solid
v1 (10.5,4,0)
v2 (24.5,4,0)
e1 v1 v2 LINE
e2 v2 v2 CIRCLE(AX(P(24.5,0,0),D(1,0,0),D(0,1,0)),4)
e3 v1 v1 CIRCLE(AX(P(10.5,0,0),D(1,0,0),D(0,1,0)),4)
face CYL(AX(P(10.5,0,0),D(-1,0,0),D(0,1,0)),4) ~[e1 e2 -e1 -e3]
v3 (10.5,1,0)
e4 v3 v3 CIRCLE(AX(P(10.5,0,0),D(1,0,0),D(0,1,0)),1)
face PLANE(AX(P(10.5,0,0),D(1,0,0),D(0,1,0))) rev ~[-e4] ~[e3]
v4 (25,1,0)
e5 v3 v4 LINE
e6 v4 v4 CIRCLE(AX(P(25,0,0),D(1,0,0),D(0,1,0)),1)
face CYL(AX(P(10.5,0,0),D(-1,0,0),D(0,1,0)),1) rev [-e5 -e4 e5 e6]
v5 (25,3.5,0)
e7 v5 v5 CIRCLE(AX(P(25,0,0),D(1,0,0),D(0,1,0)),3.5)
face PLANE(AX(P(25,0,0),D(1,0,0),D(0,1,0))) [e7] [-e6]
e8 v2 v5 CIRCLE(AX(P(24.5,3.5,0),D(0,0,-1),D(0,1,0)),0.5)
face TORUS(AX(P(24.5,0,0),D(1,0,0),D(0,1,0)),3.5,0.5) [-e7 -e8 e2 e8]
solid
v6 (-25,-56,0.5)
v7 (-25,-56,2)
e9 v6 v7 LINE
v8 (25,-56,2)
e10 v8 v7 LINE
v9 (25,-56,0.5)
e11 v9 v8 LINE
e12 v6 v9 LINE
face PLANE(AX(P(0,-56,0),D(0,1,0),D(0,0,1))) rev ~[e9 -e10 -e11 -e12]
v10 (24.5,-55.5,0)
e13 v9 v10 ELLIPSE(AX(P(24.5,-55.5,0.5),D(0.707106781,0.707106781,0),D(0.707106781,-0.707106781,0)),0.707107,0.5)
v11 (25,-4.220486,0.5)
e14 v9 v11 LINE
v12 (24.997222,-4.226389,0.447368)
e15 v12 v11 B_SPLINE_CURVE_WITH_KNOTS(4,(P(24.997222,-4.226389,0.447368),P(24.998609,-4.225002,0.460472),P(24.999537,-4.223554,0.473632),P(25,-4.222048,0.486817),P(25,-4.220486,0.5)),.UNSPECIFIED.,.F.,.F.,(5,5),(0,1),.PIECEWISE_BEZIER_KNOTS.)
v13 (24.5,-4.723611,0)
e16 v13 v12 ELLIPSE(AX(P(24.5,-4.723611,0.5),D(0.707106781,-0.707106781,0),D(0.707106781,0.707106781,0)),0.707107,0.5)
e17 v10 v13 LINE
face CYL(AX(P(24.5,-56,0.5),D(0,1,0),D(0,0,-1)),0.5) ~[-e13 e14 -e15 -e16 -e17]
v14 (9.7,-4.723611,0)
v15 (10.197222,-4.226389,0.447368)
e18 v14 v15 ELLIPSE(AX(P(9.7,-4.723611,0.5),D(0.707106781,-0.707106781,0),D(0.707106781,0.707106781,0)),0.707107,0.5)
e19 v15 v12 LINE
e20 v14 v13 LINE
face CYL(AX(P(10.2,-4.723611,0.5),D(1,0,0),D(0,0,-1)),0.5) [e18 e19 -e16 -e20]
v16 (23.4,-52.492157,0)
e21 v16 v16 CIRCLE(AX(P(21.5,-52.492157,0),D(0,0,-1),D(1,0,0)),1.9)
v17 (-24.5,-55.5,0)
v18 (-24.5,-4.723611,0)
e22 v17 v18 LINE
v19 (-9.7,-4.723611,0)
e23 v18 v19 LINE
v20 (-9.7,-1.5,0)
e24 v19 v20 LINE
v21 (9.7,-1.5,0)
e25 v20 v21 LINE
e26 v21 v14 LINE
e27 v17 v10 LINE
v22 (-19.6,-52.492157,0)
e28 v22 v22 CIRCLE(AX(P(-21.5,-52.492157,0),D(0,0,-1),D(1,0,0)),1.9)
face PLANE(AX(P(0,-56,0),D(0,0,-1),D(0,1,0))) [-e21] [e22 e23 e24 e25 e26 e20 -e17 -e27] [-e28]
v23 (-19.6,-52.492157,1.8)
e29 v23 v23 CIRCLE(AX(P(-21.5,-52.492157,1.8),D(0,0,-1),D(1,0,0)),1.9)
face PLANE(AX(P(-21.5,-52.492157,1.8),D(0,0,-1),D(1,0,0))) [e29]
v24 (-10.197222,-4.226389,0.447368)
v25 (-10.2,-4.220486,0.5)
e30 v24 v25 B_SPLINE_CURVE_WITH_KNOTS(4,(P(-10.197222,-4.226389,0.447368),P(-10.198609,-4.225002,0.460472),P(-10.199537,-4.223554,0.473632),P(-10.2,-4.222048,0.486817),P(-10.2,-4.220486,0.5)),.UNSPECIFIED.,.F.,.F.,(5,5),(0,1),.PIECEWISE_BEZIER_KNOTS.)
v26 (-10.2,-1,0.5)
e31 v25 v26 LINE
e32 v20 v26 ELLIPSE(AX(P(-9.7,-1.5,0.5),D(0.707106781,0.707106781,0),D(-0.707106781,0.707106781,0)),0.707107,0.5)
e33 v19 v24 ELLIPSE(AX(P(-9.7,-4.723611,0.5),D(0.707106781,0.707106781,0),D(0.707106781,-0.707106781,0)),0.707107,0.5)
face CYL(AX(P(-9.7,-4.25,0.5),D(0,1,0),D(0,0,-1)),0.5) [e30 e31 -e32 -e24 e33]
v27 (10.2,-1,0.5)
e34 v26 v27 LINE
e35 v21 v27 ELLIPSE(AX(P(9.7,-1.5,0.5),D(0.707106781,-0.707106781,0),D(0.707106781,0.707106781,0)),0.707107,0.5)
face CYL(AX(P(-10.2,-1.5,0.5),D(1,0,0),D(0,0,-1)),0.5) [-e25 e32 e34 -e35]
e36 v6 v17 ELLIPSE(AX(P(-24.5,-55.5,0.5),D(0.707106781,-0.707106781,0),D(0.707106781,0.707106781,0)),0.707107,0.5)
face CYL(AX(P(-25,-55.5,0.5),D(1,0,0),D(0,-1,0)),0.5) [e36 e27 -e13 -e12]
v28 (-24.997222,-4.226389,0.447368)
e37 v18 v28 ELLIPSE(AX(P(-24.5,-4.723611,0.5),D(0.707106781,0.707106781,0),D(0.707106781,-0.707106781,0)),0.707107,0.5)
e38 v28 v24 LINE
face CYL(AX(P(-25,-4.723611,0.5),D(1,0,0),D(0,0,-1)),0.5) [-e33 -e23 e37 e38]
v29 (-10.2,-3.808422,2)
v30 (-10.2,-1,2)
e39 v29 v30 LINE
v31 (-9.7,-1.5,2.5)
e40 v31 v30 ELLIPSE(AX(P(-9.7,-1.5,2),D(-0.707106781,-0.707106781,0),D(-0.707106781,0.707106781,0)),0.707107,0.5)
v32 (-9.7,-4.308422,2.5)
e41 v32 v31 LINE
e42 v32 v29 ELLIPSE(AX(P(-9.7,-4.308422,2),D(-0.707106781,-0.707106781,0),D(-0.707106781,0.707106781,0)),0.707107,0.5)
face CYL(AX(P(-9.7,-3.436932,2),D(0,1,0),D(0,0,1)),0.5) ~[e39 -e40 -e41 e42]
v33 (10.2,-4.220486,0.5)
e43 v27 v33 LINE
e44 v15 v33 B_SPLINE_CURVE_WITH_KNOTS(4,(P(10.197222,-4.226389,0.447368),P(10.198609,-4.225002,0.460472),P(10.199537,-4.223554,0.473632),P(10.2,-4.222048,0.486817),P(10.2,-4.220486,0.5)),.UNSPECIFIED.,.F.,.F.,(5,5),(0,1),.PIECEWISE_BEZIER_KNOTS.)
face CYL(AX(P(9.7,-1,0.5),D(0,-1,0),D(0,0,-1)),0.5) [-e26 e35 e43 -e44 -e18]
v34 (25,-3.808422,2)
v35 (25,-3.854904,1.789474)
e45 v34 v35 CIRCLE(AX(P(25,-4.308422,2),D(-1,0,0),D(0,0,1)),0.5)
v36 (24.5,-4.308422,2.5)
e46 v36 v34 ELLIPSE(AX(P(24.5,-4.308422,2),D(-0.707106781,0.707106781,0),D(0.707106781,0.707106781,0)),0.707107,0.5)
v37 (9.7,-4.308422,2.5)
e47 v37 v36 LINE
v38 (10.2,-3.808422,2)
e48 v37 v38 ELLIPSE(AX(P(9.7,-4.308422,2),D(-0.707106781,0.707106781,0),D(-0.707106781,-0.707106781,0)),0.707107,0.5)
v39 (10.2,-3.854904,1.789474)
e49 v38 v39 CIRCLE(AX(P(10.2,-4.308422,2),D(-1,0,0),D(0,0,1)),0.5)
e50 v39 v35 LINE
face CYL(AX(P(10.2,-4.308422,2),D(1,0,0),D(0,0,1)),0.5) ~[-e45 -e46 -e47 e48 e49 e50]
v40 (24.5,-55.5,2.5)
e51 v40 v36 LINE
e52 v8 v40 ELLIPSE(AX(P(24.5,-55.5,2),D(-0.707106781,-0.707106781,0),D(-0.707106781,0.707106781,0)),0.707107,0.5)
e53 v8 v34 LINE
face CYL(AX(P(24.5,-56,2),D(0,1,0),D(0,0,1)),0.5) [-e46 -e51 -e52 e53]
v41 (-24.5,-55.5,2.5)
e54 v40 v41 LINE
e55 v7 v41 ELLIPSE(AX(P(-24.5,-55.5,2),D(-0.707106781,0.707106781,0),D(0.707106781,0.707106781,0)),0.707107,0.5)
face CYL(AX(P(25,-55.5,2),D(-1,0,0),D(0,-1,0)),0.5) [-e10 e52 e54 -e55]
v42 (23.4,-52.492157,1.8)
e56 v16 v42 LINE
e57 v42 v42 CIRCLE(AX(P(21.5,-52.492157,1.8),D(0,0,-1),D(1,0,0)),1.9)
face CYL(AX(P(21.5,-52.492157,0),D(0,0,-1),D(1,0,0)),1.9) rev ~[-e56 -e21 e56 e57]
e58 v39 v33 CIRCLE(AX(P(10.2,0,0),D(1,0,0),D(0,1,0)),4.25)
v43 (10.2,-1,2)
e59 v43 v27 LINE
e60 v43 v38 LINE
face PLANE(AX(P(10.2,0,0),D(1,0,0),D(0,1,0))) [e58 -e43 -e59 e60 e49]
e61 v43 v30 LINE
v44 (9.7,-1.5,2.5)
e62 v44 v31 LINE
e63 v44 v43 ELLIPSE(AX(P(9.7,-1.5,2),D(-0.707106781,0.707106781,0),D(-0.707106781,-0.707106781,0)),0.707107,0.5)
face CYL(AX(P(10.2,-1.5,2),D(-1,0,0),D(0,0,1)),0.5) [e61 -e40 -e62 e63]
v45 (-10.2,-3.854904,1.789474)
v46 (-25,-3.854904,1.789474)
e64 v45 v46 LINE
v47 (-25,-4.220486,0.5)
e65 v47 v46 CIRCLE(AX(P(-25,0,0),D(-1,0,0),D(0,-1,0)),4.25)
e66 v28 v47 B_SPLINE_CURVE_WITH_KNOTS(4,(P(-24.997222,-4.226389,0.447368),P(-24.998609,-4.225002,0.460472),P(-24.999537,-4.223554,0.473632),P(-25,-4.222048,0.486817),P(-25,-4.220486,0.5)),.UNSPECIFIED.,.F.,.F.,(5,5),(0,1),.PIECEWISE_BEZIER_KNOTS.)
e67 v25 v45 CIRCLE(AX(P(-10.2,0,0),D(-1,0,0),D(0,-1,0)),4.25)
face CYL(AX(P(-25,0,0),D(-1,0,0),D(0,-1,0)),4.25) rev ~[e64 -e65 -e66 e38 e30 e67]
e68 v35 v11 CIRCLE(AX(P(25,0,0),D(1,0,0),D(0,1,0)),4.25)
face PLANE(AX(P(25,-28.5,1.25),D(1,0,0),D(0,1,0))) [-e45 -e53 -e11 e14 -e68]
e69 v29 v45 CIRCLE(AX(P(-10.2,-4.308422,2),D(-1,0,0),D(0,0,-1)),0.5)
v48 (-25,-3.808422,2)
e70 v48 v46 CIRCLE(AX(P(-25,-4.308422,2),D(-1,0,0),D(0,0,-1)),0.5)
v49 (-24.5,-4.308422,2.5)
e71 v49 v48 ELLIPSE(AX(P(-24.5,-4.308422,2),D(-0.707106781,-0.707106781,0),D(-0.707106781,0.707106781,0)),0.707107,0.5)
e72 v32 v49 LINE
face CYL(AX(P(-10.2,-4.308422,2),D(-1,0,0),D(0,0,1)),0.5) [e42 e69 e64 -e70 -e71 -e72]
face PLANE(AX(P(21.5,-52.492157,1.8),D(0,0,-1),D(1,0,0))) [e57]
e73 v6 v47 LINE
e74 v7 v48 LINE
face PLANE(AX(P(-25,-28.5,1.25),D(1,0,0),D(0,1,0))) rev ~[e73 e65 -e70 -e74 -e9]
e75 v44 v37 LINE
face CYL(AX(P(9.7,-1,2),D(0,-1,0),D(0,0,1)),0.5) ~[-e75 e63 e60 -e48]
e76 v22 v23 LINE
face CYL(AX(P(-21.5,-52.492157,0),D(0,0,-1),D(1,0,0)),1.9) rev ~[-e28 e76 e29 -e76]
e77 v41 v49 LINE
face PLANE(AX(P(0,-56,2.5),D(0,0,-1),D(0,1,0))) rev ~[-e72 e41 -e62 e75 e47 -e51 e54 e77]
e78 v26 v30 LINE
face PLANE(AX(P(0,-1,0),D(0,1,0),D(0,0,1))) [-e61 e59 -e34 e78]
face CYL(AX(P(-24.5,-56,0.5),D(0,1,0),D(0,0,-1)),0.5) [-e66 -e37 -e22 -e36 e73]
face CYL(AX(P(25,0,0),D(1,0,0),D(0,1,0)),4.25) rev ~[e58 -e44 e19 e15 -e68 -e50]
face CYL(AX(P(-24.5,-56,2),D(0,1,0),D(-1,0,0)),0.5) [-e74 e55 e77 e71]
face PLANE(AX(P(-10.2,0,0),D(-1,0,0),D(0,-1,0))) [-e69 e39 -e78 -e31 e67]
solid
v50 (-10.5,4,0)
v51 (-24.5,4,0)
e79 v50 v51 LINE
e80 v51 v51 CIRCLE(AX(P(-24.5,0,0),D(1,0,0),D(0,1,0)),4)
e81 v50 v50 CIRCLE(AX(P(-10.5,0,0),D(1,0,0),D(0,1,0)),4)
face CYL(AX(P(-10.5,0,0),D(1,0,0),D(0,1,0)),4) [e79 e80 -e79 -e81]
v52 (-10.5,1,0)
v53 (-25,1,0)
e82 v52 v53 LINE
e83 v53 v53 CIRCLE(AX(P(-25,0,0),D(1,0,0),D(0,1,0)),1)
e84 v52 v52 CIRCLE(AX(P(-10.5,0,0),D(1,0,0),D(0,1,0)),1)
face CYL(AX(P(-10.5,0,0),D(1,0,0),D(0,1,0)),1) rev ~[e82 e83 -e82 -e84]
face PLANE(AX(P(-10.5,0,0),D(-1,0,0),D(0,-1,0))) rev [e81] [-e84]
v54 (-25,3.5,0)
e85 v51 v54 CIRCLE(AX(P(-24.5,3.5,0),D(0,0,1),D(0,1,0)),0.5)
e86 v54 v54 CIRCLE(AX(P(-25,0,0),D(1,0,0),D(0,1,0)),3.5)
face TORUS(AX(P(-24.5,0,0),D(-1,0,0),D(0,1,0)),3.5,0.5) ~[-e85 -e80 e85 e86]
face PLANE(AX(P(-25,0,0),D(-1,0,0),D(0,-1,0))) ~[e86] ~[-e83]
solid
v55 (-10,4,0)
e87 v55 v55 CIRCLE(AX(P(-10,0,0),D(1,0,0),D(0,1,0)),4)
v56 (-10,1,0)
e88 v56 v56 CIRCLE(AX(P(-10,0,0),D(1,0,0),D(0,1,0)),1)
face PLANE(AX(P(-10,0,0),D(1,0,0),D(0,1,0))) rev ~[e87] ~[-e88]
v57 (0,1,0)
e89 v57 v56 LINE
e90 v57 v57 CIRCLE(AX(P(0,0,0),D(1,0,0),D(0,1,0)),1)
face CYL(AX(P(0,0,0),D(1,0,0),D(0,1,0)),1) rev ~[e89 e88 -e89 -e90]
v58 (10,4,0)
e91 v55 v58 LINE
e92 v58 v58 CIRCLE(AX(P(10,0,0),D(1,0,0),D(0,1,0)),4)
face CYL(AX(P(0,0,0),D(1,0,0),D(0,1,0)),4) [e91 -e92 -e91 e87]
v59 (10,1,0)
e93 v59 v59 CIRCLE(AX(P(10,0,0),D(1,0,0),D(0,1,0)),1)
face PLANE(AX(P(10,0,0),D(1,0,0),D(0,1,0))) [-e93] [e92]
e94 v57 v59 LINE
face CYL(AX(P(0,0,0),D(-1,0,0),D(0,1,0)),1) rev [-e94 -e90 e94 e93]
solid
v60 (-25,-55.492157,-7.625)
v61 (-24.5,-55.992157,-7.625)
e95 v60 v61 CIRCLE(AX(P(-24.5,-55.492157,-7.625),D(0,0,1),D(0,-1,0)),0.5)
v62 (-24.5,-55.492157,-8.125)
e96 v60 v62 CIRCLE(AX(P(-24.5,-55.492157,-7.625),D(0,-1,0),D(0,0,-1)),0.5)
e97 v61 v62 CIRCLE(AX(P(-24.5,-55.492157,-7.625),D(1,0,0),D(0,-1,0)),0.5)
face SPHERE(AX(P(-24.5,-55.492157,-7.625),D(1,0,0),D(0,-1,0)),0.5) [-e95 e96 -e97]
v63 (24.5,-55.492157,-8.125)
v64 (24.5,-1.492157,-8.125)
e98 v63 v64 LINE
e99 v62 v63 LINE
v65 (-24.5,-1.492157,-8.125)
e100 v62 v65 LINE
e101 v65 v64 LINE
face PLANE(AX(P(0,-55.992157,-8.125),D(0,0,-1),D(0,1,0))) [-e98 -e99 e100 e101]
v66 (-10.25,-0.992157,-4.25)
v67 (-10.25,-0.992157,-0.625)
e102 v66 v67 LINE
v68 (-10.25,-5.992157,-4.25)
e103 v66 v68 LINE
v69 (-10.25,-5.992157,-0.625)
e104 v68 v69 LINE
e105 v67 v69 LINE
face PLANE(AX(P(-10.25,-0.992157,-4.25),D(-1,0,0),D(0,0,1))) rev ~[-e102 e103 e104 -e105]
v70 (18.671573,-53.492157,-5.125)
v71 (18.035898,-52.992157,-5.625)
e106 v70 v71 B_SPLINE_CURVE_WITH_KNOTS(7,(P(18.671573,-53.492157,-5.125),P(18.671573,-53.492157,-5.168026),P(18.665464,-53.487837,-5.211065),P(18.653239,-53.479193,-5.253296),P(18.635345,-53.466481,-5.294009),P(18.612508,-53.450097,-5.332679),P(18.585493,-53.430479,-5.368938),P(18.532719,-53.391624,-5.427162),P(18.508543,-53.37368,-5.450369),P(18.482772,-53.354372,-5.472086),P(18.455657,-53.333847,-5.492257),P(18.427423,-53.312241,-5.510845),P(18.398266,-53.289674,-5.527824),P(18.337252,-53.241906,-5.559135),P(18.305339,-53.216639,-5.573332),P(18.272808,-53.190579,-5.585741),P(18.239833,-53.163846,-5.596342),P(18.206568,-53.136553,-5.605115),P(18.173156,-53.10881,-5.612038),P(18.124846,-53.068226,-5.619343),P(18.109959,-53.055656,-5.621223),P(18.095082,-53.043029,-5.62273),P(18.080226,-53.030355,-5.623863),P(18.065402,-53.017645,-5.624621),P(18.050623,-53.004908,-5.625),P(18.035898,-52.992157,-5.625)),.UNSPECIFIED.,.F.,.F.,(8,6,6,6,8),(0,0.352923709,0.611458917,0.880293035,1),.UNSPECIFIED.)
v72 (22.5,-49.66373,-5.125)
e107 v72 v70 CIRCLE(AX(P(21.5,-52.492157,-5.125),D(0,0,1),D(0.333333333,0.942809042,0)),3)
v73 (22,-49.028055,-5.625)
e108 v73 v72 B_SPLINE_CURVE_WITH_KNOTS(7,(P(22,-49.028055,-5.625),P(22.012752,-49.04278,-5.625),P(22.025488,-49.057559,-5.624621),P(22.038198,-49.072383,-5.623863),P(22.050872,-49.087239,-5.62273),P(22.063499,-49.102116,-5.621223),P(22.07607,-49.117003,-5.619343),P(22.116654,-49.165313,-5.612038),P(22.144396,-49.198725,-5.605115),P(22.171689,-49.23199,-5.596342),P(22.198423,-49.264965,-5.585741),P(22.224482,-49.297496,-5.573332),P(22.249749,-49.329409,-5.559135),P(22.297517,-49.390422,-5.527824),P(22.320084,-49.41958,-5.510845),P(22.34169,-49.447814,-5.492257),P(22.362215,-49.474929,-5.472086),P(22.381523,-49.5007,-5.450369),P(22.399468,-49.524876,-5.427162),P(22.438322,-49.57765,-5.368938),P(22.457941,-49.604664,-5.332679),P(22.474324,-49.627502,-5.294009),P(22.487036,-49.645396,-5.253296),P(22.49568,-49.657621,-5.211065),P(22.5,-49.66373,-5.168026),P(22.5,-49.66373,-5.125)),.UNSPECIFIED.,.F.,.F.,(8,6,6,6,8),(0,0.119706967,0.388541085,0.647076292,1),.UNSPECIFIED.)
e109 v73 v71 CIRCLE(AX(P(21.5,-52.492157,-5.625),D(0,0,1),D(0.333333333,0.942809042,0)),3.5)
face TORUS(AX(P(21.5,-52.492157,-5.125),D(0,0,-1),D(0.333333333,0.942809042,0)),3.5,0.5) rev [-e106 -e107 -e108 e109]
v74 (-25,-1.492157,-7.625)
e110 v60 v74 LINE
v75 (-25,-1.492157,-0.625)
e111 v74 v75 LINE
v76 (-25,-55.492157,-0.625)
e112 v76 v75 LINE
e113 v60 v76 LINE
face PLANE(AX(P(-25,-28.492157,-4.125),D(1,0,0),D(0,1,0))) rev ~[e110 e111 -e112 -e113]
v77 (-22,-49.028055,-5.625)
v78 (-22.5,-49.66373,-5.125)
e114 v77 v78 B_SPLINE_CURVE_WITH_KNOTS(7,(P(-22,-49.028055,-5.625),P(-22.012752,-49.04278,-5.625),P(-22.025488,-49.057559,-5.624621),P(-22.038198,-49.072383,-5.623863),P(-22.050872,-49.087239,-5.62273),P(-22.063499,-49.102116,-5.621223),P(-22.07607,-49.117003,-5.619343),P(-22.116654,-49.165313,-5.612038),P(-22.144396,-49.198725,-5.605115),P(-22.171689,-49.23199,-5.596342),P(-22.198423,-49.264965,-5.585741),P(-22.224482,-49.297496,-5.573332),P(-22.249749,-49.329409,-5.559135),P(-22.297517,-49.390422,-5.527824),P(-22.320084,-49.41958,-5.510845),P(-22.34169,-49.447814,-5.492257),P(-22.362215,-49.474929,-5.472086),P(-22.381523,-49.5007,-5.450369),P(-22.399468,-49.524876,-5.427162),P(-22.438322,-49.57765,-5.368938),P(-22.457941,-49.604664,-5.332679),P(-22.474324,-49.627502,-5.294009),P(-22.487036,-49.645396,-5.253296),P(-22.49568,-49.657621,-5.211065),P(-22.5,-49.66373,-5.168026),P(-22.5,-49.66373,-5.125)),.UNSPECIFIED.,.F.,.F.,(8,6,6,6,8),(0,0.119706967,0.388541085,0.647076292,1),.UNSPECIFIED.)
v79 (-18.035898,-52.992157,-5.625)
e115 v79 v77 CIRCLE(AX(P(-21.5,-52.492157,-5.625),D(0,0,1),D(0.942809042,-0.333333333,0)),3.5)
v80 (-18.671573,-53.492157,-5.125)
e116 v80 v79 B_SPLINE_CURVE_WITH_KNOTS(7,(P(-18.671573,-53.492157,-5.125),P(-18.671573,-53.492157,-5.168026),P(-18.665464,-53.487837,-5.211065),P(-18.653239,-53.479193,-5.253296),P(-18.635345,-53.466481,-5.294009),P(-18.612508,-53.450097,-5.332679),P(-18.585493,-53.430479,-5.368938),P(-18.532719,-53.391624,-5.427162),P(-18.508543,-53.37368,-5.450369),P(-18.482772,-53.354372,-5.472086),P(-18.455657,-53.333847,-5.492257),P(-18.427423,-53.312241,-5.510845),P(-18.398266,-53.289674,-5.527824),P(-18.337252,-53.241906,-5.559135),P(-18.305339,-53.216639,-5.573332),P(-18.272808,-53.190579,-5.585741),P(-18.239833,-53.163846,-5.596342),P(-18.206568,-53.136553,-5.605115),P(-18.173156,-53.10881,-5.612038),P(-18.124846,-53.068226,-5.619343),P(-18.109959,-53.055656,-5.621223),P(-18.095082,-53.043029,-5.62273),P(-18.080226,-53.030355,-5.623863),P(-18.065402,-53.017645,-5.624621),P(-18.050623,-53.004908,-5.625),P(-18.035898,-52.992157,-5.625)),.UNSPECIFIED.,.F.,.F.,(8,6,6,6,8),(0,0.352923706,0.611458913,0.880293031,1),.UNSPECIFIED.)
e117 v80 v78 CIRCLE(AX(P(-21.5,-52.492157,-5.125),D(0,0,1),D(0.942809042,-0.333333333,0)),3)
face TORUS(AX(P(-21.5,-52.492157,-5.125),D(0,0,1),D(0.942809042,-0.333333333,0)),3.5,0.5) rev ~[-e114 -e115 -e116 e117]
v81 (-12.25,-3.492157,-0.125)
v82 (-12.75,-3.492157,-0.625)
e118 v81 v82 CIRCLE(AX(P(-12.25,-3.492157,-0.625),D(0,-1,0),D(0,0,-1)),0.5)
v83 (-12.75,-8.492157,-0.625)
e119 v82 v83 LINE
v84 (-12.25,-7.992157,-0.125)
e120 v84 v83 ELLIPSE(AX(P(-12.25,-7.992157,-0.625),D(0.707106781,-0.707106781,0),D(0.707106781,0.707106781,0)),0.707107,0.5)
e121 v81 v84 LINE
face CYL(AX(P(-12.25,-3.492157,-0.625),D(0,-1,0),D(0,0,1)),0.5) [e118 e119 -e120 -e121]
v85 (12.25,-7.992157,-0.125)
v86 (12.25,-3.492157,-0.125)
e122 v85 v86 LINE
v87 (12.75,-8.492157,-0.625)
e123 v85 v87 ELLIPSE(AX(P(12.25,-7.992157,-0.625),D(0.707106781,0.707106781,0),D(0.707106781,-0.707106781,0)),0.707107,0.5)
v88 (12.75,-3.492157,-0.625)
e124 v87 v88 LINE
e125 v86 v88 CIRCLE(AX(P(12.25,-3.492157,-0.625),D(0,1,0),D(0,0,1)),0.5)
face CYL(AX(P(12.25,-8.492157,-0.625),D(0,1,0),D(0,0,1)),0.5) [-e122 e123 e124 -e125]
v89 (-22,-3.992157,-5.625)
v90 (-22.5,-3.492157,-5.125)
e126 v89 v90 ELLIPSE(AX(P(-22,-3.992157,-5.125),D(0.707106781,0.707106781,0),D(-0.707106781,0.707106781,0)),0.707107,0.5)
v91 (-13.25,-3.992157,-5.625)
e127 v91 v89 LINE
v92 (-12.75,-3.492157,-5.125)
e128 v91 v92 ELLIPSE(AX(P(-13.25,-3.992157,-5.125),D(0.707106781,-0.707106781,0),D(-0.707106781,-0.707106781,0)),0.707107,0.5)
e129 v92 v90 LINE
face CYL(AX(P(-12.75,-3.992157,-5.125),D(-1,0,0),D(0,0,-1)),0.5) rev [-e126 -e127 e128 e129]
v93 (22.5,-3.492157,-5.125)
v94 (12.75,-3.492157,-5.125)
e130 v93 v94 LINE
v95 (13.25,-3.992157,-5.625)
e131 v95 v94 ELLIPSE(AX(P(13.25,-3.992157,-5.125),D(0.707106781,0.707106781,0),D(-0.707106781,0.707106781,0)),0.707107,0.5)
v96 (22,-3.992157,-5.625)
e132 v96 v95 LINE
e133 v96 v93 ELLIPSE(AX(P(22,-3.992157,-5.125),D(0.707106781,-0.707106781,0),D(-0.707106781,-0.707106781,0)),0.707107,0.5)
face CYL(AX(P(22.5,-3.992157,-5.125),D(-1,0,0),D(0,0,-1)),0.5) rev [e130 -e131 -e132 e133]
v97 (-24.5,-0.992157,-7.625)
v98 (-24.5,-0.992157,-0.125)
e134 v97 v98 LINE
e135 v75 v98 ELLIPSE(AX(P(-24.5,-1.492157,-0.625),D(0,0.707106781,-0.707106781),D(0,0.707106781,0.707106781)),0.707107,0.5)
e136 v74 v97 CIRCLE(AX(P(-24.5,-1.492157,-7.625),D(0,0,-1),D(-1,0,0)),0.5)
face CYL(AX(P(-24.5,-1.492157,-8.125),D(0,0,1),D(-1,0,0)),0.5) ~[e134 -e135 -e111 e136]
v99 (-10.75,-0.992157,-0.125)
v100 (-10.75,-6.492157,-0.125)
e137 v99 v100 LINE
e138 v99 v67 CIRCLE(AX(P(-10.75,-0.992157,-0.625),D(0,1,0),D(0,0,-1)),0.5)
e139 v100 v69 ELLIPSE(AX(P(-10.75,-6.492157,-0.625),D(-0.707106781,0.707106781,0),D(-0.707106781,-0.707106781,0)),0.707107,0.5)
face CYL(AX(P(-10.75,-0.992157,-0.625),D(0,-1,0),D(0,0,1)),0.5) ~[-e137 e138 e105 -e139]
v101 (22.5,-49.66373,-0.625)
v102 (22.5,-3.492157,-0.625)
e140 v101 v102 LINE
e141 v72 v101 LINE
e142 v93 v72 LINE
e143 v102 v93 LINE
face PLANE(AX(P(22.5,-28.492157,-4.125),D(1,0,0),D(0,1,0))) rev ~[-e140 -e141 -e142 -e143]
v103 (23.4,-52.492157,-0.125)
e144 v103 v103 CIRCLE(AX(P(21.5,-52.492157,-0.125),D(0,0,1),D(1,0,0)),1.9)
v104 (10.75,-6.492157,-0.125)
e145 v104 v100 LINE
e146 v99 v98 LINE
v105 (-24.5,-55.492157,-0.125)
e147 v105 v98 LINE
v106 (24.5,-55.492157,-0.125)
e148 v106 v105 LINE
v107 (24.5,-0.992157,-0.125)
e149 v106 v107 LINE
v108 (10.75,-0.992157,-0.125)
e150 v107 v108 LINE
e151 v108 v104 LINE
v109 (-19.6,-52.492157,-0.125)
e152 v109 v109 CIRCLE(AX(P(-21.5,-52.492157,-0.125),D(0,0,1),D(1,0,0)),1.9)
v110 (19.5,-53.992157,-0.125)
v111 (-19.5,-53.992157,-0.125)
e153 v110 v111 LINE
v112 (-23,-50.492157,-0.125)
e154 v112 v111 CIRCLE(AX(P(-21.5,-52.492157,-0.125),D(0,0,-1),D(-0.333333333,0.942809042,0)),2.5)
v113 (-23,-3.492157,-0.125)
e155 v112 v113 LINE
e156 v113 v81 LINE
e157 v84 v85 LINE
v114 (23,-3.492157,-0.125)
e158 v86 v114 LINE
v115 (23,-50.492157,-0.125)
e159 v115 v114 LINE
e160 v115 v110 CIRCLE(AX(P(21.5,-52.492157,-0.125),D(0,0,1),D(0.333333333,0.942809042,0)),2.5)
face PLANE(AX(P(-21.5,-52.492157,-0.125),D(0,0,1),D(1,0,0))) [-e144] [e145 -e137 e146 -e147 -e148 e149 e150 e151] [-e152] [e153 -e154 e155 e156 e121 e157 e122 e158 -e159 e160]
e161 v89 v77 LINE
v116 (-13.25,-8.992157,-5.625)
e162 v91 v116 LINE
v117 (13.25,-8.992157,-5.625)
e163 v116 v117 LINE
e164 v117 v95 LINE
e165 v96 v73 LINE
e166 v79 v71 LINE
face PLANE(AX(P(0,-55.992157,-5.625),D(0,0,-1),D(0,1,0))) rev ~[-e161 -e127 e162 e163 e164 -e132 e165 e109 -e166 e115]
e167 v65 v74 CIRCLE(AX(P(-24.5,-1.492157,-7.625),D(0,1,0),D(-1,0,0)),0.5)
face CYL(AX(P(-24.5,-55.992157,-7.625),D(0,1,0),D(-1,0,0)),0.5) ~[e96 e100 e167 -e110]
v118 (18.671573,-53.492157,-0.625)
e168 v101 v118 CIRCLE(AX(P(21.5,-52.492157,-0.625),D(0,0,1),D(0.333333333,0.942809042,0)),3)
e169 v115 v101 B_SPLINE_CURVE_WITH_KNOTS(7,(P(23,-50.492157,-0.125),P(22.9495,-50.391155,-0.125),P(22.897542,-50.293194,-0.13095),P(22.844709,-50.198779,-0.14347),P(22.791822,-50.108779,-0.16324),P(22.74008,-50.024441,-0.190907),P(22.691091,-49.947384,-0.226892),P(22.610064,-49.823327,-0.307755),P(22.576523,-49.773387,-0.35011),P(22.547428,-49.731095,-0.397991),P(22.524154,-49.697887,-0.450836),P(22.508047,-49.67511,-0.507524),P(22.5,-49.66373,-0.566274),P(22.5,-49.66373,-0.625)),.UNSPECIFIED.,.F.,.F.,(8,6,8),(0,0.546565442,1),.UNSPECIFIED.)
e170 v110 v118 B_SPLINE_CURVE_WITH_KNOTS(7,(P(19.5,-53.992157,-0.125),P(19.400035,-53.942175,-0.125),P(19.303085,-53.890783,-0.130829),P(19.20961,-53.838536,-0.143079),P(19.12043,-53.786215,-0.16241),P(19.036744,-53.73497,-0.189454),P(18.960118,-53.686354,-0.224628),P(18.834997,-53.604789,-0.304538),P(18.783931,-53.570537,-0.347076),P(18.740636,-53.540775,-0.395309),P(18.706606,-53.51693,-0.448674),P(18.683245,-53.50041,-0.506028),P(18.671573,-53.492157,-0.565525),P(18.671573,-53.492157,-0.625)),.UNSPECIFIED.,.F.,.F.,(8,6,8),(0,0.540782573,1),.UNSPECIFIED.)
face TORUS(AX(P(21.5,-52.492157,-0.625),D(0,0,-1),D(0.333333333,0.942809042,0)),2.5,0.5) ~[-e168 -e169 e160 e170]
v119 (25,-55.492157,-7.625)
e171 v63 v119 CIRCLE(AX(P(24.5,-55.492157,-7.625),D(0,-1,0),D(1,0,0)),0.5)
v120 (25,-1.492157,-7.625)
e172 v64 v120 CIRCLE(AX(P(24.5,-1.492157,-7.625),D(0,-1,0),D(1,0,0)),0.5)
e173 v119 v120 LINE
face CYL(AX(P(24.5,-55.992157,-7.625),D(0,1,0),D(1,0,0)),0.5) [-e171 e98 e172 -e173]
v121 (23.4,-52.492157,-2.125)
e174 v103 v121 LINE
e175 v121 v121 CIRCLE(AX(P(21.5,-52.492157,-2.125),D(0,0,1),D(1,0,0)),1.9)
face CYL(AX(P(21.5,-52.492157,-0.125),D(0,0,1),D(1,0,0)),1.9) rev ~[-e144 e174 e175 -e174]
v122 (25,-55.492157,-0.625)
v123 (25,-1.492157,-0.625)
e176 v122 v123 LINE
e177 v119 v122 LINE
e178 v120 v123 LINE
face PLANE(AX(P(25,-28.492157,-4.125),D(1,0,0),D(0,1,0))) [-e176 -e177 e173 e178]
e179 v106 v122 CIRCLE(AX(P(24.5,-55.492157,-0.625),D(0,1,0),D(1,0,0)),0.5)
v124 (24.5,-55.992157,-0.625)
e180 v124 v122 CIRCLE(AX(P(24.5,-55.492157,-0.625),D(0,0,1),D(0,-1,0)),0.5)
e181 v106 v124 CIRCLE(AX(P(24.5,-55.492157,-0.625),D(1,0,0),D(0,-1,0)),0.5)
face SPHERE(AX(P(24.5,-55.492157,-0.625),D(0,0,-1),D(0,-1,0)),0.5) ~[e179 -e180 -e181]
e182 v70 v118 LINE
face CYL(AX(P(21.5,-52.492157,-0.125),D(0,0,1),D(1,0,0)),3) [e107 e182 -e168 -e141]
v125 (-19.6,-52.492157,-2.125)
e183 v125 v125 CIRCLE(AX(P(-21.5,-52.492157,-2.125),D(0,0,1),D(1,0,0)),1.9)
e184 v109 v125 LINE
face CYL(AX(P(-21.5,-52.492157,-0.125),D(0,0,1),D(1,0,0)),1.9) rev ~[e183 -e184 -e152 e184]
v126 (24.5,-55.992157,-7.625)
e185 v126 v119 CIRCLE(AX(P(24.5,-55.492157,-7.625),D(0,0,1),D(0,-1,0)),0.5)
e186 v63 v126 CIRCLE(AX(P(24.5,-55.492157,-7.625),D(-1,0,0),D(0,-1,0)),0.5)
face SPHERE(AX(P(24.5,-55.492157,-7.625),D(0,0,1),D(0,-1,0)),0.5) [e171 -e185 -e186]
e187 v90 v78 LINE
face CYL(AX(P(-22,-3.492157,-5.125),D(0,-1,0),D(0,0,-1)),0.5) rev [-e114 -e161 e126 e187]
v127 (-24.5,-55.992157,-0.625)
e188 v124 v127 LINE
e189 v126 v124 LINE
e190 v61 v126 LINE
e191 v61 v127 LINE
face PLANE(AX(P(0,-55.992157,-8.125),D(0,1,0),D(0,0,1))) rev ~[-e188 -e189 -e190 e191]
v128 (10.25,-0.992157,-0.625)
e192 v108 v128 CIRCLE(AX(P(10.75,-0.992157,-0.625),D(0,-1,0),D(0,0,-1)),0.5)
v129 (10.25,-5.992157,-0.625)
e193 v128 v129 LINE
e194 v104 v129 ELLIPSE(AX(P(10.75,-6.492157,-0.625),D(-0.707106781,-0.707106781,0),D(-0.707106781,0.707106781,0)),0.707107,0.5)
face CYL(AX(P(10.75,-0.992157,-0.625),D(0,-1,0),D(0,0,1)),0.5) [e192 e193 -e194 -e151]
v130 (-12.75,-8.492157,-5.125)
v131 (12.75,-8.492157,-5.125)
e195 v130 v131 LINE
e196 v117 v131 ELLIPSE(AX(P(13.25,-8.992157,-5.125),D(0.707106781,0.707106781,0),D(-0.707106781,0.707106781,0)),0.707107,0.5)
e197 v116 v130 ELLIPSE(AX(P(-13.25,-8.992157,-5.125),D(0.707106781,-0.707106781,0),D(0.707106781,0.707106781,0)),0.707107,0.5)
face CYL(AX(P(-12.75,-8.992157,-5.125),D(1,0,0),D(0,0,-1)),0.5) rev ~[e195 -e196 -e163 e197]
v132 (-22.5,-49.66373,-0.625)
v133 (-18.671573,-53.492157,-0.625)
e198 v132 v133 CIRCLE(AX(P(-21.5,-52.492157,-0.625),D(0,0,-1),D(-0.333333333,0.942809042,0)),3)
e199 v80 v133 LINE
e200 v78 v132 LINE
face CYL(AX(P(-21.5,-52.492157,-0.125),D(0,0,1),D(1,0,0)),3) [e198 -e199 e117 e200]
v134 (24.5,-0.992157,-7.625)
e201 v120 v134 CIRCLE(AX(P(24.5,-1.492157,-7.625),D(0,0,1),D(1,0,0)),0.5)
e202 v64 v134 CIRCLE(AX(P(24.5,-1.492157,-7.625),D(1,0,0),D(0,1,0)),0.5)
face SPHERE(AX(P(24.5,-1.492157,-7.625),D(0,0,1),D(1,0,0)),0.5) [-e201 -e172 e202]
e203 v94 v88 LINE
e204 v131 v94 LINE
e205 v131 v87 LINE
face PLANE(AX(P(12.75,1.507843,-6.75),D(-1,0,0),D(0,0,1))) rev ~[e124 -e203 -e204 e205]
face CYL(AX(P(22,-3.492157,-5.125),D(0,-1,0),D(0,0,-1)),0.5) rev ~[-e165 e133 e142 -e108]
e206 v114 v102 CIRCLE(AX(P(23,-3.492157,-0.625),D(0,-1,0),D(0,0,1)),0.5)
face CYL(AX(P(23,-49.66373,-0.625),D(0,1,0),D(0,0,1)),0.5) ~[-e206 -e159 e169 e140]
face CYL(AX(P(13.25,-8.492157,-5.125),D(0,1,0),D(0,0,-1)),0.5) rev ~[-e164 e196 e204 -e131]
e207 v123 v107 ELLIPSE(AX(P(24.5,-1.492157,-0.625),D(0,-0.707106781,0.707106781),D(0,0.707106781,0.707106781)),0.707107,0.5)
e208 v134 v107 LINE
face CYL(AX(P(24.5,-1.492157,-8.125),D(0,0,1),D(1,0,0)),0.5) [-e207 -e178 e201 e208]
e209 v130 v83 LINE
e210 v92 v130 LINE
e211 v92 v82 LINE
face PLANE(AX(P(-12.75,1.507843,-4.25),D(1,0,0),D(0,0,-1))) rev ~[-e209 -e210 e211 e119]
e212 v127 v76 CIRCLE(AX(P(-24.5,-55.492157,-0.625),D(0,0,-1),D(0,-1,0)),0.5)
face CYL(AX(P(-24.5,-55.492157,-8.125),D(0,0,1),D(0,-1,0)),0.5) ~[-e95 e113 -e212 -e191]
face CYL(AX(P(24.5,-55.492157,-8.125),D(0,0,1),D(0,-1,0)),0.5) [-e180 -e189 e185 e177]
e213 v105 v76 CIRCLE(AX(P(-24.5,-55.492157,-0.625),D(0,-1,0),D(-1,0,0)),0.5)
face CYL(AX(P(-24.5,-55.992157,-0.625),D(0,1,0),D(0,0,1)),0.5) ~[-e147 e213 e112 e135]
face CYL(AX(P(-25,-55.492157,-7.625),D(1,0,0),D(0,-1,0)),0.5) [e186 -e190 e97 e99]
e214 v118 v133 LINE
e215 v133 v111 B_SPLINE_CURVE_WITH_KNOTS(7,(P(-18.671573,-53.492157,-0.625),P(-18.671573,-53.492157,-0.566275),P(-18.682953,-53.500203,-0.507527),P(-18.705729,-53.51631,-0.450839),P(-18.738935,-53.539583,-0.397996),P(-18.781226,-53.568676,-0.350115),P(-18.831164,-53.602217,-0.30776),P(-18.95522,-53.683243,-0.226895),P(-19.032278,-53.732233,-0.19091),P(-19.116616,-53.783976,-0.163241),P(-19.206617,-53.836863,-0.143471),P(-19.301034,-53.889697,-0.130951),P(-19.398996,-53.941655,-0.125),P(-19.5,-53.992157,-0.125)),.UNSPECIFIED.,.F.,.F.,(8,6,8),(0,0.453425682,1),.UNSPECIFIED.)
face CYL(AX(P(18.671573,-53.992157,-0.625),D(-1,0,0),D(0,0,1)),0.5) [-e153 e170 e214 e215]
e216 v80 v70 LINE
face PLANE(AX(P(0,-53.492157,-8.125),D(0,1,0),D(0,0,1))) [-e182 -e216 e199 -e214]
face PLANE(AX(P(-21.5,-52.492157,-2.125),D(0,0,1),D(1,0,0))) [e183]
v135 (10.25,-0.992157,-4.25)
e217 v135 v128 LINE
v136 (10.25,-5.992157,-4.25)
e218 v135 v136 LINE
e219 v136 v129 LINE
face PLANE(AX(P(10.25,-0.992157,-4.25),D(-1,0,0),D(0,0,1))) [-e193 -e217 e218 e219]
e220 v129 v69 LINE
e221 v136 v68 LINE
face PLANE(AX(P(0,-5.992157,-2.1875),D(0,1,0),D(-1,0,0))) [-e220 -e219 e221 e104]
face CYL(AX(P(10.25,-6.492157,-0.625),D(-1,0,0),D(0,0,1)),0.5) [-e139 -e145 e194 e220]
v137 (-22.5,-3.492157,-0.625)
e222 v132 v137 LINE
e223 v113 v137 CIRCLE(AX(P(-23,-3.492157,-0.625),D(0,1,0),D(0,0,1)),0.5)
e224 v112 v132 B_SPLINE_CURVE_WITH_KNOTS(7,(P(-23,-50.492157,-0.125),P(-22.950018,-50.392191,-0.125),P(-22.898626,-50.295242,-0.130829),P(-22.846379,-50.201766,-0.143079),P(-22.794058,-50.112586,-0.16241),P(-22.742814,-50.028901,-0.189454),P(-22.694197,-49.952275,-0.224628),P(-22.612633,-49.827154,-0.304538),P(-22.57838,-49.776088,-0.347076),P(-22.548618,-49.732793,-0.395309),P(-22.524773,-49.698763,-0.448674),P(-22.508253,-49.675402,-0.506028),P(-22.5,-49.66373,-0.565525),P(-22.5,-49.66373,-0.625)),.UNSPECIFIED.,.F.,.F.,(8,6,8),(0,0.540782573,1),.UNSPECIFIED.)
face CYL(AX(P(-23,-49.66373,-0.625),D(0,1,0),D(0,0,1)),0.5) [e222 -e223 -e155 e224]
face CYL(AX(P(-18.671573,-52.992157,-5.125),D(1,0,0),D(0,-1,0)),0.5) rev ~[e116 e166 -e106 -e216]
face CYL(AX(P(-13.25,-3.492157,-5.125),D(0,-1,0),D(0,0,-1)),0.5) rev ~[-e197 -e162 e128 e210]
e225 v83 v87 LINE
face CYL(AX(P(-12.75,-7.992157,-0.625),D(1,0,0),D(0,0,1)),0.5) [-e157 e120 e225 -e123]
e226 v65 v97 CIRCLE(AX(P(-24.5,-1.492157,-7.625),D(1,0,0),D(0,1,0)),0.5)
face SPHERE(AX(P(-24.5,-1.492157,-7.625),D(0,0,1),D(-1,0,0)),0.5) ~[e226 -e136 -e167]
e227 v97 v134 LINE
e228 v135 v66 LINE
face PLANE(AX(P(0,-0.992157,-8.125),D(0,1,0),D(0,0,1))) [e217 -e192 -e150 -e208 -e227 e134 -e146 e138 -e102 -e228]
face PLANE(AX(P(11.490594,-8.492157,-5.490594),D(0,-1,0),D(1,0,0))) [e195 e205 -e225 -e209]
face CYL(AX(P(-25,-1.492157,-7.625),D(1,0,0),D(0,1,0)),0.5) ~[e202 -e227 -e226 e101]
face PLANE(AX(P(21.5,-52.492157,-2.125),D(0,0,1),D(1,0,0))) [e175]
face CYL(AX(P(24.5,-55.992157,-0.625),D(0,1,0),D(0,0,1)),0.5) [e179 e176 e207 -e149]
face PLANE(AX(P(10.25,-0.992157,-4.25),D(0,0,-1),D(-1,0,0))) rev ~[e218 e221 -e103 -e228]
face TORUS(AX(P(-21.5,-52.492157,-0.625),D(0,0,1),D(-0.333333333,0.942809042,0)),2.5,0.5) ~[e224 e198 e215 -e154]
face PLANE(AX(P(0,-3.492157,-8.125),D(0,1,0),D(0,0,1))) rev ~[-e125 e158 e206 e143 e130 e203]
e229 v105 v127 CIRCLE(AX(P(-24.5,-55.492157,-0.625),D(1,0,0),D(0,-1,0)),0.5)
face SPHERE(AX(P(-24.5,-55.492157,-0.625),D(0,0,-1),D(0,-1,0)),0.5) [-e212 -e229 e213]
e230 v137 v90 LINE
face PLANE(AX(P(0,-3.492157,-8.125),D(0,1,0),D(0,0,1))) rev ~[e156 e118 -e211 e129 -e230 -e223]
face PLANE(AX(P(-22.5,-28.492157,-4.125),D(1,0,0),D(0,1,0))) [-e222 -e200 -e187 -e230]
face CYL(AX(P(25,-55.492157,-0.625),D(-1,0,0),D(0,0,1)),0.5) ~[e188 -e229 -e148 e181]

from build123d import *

# Parameters (mm, degrees)
F0_R          = 4
F0_R_2        = 1
F3_DEPTH      = 10
F3_DEPTH_BACK = 10
F2_W          = 55
F2_H          = 2.5
F4_DEPTH      = 25
F4_DEPTH_BACK = 25
F1_W          = 55
F1_H          = 8
F5_W          = 20.5
F5_H          = 4.125
F6_DEPTH      = 5
F8_R          = 4
F8_R_2        = 1
F9_DEPTH      = 14.5
F11_R         = 4.25
F12_DEPTH     = 14.8
F13_R         = 4.25
F14_DEPTH     = 14.8
F15_T         = 2.5
F15_T3_DEPTH  = 10
F15_T5_DEPTH  = 9.125
F15_T7_DEPTH  = 25.5
F18_R         = 3
F19_DEPTH     = 5.5
F20_R         = 1.9
F21_DEPTH     = 2
F22_R         = 0.5
F22_2_R       = 0.5
F22_3_R       = 0.5
F23_R         = 0.5
F24_R         = 1.9
F25_DEPTH     = 1.8


# Not quite as in the source:
# - a shell that OpenCascade refuses in one call is made with other operations: the cavity is built on its own and cut out


with BuildPart() as f3:
    # F0 (on Right) → F3 (new body, two sides)
    with BuildSketch(Plane.YZ) as f3_sk:
        Circle(F0_R)
        Circle(F0_R_2, mode=Mode.SUBTRACT)
    extrude(amount=F3_DEPTH)
    extrude(f3_sk.sketch, amount=-F3_DEPTH_BACK)


with BuildPart() as f4:
    # F2 (on Right) → F4 (new body, two sides)
    with BuildSketch(Plane.YZ) as f4_sk:
        with Locations((-28.5, 1.25)):
            Rectangle(F2_W, F2_H)
    extrude(amount=F4_DEPTH)
    extrude(f4_sk.sketch, amount=-F4_DEPTH_BACK)

    # F11 (on face) → F12 (cut)
    with BuildSketch(Plane.YZ.offset(25)):
        Circle(F11_R)
    extrude(amount=-F12_DEPTH, mode=Mode.SUBTRACT)

    # F13 (on face) → F14 (cut)
    with BuildSketch(Plane(origin=(-25, 0, 0), x_dir=(0, -1, 0), z_dir=(-1, 0, 0))):
        Circle(F13_R)
    extrude(amount=-F14_DEPTH, mode=Mode.SUBTRACT)

    # F23
    f23_edges = [f4.edges().sort_by_distance(p)[0] for p in [
        (10.2, -2.218466, 2.5),
        (0, -1, 2.5),
        (-10.2, -2.218466, 2.5),
        (-17.6, -3.436932, 2.5),
        (-25, -29.718466, 2.5),
        (0, -56, 2.5),
        (25, -29.718466, 2.5),
        (17.6, -3.436932, 2.5),
        (0, -56, 0),
        (-25, -30.125, 0),
        (-17.6, -4.25, 0),
        (-10.2, -2.625, 0),
        (0, -1, 0),
        (10.2, -2.625, 0),
        (17.6, -4.25, 0),
        (25, -30.125, 0),
    ]]
    fillet(f23_edges, radius=F23_R)

    # F24 (on face) → F25 (cut)
    with BuildSketch(Plane(origin=(0, 0, 0), x_dir=(1, 0, 0), z_dir=(0, 0, -1))):
        with Locations((21.5, 52.4921567416)):
            Circle(F24_R)
        with Locations((-21.5, 52.4921567416)):
            Circle(F24_R)
    extrude(amount=-F25_DEPTH, mode=Mode.SUBTRACT)


with BuildPart() as f4b:
    # F1 (on Right) → F4, piece 2 (new body, two sides)
    with BuildSketch(Plane.YZ) as f4_2_sk:
        with Locations((-28.4921567416, -4.125)):
            Rectangle(F1_W, F1_H)
    extrude(amount=F4_DEPTH)
    extrude(f4_2_sk.sketch, amount=-F4_DEPTH_BACK)

    # F5 (on face) → F6 (cut)
    with BuildSketch(Plane(origin=(0, -0.9921567416, 0), x_dir=(-1, 0, 0), z_dir=(0, 1, 0))):
        with Locations((0, -2.1875)):
            Rectangle(F5_W, F5_H)
    extrude(amount=-F6_DEPTH, mode=Mode.SUBTRACT)

    # F15: shell of thickness 2.5, made by hand


with BuildPart() as f9:
    # F8 (on offset) → F9 (new body, through all)
    with BuildSketch(Plane.YZ.offset(10.5)):
        Circle(F8_R)
        Circle(F8_R_2, mode=Mode.SUBTRACT)
    extrude(amount=F9_DEPTH)


with BuildPart() as f10_1:
    # F10: instance of F9
    add(f9.part.mirror(Plane.YZ))

    # F22#3
    f22_3_edges = [f10_1.edges().sort_by_distance(p)[0] for p in [
        (-25, -4, 0),
    ]]
    fillet(f22_3_edges, radius=F22_3_R)


with BuildPart() as f15_core1:
    # F15_t2: copy of F4b
    add(f4b.part)

    # the walls: a layer under each face that stays
    f15_faces = [f15_core1.faces().sort_by_distance(p)[0] for p in [
        (16.6666666667, -0.9921567416, -6.7916666667),
        (0, -28.4921567416, -8.125),
        (-25, -28.4921567416, -4.125),
        (-10.25, -3.4921567416, -2.1875),
        (0, -3.4921567416, -4.25),
        (10.25, -3.4921567416, -2.1875),
        (25, -28.4921567416, -4.125),
        (0, -55.9921567416, -4.125),
        (0, -5.9921567416, -2.1875),
    ]]
    thicken(f15_faces, amount=-F15_T, mode=Mode.SUBTRACT)

    # F15_s4 → F15_t3 (cut)
    with BuildSketch(Plane.XZ.offset(-1.5078432584)):
        Polygon((-10.225, -4.225), (-12.75, -4.25), (-12.75, -6.75), (-10.25, -6.75), align=None)
        Polygon((10.225, -4.225), (10.25, -6.75), (12.75, -6.75), (12.75, -4.25), align=None)
    extrude(amount=F15_T3_DEPTH, mode=Mode.SUBTRACT)

    # F15_s6 → F15_t5 (cut)
    with BuildSketch(Plane.XY.offset(-6.75)):
        Polygon((-10.225, -5.9671567416), (-12.75, -5.9921567416), (-12.75, -8.4921567416), (-10.25, -8.4921567416), align=None)
        Polygon((10.225, -5.9671567416), (12.75, -5.9921567416), (12.75, -8.4921567416), (10.25, -8.4921567416), align=None)
    extrude(amount=F15_T5_DEPTH, mode=Mode.SUBTRACT)

    # F15_s8 → F15_t7 (cut)
    with BuildSketch(Plane.YZ.offset(-12.75)):
        Polygon((-5.9671567416, -4.225), (-5.9921567416, -6.75), (-8.4921567416, -6.75), (-8.4921567416, -4.25), align=None)
    extrude(amount=F15_T7_DEPTH, mode=Mode.SUBTRACT)


with BuildPart() as f4b_1:
    add(f4b.part)

    # what is left inside the walls is the cavity
    f15_cavity = [f15_core1.part.solids().sort_by_distance(p)[0] for p in [
        (7.5, -28.492157, -5.6),
    ]]
    add(f15_cavity, mode=Mode.SUBTRACT)

    # F18 (on offset) → F19 (join, through all)
    with BuildSketch(Plane.XY.offset(-0.125)):
        with Locations((-21.5, -52.4921567416)):
            Circle(F18_R)
        with Locations((21.5, -52.4921567416)):
            Circle(F18_R)
    extrude(amount=-F19_DEPTH)

    # F20 (on offset) → F21 (cut)
    with BuildSketch(Plane.XY.offset(-0.125)):
        with Locations((-21.5, -52.4921567416)):
            Circle(F20_R)
        with Locations((21.5, -52.4921567416)):
            Circle(F20_R)
    extrude(amount=-F21_DEPTH, mode=Mode.SUBTRACT)

    # F22
    f22_edges = [f4b_1.edges().sort_by_distance(p)[0] for p in [
        (0, -53.492157, -5.625),
        (19.37868, -50.370836, -5.625),
        (22.5, -26.577943, -5.625),
        (17.625, -3.492157, -5.625),
        (12.75, -5.992157, -5.625),
        (11.494431, -8.492157, -5.625),
        (0, -8.492157, -5.625),
        (-11.494431, -8.492157, -5.625),
        (-12.75, -5.992157, -5.625),
        (-17.625, -3.492157, -5.625),
        (-22.5, -26.577943, -5.625),
        (-19.37868, -50.370836, -5.625),
        (25, -55.992157, -4.125),
        (0, -55.992157, -8.125),
        (-25, -55.992157, -4.125),
        (0, -55.992157, -0.125),
        (25, -0.992157, -4.125),
        (25, -28.492157, -0.125),
        (25, -28.492157, -8.125),
        (-25, -0.992157, -4.125),
        (-25, -28.492157, -0.125),
        (-25, -28.492157, -8.125),
        (0, -0.992157, -8.125),
        (-22.5, -26.577943, -0.125),
        (-19.37868, -50.370836, -0.125),
        (0, -53.492157, -0.125),
        (19.37868, -50.370836, -0.125),
        (22.5, -26.577943, -0.125),
        (0, -8.492157, -0.125),
        (0, -5.992157, -0.125),
        (10.25, -3.492157, -0.125),
        (-10.25, -3.492157, -0.125),
        (-12.75, -5.992157, -0.125),
        (-11.5, -8.492157, -0.125),
        (11.5, -8.492157, -0.125),
        (12.75, -5.992157, -0.125),
    ]]
    fillet(f22_edges, radius=F22_R)


with BuildPart() as f9_1:
    add(f9.part)

    # F22#2
    f22_2_edges = [f9_1.edges().sort_by_distance(p)[0] for p in [
        (25, -4, 0),
    ]]
    fillet(f22_2_edges, radius=F22_2_R)


solid = Compound([f3.part, f4.part, f10_1.part, f4b_1.part, f9_1.part])
